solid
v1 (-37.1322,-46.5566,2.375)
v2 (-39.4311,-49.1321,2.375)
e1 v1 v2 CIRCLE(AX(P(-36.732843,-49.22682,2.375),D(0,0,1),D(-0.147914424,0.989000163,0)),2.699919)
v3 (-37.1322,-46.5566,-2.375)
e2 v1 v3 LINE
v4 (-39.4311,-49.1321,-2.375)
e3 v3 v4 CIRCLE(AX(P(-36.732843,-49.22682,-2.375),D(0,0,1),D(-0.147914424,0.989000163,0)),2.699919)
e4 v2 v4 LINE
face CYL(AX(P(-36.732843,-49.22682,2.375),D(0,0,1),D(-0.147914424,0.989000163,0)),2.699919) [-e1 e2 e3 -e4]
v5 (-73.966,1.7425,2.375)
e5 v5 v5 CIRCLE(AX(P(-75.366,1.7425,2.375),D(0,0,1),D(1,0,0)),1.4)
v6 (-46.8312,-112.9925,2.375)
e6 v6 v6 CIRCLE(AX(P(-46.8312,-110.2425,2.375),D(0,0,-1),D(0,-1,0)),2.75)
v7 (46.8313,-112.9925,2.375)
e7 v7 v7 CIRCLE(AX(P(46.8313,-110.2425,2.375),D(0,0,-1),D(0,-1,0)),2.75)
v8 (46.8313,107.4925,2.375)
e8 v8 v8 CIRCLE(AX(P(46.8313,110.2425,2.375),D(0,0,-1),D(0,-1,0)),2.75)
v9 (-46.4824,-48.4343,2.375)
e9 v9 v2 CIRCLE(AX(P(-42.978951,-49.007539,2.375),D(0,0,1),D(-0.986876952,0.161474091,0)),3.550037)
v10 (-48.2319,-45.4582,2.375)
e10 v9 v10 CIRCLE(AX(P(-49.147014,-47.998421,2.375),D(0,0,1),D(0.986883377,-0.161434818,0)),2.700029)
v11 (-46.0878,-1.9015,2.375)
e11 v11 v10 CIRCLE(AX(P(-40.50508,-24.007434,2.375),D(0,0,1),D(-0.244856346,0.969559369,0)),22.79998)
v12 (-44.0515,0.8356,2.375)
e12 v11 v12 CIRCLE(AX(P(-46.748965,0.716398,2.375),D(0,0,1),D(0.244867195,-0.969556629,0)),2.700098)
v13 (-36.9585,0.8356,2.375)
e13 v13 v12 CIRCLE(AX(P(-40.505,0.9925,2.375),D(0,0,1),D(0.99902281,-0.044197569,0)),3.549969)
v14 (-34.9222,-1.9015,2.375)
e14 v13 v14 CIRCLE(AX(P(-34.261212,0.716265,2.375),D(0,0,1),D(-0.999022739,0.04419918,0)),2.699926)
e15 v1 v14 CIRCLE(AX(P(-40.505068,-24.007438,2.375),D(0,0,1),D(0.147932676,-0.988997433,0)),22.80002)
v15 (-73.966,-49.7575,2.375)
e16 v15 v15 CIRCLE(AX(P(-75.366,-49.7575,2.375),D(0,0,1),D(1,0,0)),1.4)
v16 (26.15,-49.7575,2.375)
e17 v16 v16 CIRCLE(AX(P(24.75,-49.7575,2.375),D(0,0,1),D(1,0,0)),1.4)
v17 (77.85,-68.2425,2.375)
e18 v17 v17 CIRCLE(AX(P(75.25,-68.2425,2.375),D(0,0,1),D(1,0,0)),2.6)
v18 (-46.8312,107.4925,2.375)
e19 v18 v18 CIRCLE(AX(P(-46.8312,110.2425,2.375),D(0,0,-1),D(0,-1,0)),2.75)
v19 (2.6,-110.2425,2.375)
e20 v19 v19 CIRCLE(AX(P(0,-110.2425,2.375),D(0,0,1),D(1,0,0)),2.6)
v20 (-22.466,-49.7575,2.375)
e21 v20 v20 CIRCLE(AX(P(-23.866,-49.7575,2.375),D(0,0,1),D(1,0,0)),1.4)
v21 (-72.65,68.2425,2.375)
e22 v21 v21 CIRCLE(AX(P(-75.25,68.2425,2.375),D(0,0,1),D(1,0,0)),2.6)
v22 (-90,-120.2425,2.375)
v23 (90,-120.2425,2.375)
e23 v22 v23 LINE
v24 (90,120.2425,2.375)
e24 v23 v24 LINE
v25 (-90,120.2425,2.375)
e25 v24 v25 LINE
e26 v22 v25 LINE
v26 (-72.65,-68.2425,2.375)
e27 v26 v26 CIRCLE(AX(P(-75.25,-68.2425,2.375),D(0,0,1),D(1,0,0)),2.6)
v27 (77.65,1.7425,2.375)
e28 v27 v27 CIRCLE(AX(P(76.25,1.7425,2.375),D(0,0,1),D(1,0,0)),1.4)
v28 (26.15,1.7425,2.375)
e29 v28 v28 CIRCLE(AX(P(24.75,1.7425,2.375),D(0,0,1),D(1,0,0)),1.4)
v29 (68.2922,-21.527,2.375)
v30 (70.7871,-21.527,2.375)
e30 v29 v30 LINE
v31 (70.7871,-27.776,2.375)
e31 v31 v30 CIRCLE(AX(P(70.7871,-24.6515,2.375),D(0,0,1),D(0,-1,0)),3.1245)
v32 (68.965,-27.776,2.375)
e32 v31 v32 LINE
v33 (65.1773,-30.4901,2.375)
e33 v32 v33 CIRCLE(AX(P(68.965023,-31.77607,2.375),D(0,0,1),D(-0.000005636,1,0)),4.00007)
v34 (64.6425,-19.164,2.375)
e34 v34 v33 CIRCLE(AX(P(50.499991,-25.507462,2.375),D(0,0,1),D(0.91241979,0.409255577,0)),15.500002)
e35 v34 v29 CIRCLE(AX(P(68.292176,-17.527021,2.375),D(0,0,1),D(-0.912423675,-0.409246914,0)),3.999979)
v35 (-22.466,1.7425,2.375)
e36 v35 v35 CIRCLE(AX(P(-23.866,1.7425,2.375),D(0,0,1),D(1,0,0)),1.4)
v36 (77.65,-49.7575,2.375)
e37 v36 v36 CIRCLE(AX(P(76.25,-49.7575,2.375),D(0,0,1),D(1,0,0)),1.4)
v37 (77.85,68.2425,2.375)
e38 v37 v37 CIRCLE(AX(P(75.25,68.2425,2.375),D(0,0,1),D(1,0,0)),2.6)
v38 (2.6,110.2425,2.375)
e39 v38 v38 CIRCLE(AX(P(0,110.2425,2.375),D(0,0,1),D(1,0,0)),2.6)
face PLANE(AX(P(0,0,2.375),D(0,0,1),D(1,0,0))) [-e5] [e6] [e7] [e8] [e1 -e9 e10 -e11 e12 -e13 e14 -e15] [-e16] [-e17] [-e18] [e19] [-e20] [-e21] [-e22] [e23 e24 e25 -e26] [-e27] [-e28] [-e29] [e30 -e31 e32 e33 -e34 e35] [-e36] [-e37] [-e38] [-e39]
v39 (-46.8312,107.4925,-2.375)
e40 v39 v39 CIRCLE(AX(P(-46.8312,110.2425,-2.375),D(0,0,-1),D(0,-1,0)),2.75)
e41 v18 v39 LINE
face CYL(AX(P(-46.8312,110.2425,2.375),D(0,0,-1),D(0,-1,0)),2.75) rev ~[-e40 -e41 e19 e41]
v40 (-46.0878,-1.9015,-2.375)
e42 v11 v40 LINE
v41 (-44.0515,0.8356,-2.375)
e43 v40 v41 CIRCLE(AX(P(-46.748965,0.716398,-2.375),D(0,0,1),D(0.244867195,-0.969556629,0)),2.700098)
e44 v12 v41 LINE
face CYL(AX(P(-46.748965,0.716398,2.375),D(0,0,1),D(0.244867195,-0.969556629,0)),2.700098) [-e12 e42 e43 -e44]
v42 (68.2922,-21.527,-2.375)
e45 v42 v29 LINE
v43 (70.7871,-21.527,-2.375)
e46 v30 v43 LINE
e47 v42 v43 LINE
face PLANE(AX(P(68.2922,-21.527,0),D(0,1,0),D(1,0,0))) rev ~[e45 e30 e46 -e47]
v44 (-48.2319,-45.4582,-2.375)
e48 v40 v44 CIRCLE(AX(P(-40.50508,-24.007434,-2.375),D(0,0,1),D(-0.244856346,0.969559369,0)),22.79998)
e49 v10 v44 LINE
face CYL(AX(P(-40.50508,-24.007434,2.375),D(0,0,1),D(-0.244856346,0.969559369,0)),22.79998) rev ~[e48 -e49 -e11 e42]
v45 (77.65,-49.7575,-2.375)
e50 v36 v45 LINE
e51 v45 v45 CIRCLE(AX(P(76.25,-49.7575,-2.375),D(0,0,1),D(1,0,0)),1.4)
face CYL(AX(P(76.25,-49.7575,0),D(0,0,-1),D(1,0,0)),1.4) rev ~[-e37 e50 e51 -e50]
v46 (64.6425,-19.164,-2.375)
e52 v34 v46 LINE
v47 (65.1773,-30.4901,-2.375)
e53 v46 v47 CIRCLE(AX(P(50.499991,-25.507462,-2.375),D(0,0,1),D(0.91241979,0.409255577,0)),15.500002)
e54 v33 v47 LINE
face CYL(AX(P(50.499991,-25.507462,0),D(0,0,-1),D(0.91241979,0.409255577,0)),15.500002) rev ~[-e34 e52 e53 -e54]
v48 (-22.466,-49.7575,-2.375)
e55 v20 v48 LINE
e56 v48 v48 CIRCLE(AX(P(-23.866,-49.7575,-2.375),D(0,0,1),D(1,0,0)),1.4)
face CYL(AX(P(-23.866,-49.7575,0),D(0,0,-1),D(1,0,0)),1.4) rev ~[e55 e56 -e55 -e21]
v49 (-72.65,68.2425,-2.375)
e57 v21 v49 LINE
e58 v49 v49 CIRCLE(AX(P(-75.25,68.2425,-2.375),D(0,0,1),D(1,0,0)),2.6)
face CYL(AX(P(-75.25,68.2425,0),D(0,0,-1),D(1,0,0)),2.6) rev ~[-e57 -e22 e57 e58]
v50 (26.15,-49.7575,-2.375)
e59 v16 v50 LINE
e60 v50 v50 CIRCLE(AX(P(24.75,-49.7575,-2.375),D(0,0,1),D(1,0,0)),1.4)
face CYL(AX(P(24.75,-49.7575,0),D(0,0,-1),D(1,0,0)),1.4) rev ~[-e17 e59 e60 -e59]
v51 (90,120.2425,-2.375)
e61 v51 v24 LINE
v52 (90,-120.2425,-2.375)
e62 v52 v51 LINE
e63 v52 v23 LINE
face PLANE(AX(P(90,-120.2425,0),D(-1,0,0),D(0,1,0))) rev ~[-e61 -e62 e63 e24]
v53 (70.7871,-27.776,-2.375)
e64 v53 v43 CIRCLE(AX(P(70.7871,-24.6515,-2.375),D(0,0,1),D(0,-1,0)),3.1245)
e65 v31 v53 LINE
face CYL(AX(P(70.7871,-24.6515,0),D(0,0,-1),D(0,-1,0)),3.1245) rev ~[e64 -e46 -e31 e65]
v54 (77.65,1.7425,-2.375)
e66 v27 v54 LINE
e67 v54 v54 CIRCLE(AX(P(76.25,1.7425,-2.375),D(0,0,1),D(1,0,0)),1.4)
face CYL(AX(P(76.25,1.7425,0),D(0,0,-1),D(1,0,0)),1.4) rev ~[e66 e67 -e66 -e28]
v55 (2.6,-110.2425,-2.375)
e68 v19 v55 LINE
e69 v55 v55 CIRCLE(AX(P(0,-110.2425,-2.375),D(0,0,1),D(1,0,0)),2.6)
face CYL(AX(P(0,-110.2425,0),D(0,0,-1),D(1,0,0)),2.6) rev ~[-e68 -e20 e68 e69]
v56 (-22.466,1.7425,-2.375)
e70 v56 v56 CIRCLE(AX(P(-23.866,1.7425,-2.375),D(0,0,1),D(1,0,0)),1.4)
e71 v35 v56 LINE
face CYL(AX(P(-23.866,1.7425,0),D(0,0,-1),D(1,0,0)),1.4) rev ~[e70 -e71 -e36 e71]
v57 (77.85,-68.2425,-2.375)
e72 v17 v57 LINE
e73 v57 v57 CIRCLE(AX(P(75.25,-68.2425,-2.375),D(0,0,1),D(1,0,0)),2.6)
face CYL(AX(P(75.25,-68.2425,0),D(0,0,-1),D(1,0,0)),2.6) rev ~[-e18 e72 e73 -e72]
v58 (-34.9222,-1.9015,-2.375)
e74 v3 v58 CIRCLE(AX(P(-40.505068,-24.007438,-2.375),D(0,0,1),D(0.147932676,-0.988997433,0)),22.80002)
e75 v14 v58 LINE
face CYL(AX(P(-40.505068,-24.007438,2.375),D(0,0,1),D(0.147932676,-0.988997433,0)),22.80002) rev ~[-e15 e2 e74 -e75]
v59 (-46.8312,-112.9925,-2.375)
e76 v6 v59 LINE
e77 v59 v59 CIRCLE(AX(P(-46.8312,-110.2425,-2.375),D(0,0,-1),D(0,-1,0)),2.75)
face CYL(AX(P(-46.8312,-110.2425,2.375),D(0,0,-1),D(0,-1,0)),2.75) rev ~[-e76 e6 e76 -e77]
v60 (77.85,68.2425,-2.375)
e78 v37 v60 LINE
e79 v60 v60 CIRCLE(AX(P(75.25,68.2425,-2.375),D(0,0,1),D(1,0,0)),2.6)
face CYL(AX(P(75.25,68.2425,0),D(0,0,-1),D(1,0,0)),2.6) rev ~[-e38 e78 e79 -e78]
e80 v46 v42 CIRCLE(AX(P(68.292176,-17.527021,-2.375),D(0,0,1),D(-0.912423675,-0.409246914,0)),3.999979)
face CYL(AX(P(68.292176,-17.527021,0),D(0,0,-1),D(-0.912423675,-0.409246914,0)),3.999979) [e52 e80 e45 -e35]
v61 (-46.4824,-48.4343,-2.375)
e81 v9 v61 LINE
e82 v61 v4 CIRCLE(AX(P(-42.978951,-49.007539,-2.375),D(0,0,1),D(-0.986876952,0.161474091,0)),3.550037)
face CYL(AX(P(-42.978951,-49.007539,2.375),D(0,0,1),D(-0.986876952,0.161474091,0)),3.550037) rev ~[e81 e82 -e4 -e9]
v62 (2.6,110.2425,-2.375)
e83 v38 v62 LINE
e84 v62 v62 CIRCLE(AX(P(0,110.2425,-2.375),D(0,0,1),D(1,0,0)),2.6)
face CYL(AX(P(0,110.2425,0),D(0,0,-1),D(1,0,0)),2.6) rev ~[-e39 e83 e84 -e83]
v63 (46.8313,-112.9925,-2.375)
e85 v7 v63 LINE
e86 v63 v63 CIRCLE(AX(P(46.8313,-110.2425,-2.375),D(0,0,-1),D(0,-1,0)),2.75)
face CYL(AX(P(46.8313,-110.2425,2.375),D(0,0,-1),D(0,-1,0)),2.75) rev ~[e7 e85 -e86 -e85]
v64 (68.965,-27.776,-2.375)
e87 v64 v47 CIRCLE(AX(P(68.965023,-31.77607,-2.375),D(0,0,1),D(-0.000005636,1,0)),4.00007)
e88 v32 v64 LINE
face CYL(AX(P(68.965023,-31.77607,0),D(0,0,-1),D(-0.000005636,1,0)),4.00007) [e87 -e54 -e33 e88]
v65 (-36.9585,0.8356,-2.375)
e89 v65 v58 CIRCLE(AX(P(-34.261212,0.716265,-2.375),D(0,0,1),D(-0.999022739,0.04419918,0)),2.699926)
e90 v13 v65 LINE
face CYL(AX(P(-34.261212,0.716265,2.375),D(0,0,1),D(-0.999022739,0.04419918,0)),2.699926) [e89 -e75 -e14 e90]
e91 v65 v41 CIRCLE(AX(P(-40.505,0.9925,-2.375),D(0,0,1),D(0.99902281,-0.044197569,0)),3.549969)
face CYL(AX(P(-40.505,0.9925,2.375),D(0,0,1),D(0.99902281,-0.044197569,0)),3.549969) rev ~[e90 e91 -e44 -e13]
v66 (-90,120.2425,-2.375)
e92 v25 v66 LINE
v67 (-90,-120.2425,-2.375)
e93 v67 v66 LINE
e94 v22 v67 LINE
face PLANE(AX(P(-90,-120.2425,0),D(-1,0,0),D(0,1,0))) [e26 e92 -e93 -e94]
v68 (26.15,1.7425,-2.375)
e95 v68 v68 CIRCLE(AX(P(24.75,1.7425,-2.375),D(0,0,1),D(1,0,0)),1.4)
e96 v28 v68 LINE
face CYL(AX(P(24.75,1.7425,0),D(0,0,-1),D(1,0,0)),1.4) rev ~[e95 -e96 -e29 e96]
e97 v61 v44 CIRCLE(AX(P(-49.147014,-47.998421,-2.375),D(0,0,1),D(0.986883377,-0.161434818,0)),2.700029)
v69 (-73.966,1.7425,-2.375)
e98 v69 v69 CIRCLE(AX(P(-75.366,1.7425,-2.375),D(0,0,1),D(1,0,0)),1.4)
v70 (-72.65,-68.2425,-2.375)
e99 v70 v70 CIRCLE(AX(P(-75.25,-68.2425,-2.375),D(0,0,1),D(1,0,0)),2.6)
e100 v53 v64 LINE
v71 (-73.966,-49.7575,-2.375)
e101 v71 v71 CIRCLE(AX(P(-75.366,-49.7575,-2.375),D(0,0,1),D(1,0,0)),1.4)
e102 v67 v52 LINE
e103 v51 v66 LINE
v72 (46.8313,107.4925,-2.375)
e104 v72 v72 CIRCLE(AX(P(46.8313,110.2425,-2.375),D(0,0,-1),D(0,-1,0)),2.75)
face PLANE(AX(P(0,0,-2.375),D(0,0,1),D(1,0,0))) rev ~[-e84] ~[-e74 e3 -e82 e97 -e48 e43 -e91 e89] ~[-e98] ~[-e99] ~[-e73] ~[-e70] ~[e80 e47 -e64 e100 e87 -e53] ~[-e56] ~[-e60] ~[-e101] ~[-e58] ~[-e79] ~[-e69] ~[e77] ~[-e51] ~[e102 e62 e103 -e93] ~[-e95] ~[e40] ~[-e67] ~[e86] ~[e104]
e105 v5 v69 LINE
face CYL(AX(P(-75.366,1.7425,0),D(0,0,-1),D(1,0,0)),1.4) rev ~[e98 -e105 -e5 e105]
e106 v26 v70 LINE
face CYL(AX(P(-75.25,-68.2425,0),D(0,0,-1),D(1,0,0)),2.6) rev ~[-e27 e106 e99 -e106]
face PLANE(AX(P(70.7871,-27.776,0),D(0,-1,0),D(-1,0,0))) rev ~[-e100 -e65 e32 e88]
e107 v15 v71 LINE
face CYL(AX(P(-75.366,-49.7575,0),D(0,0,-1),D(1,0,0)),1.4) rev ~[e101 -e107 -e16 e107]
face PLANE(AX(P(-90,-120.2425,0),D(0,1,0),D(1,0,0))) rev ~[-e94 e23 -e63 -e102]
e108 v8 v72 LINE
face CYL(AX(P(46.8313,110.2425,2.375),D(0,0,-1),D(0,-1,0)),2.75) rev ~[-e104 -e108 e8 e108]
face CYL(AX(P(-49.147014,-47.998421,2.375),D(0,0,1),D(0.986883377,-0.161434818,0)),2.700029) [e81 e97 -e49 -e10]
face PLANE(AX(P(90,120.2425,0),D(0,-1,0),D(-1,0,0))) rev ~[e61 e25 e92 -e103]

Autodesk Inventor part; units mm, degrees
ref_plane "YZ Plane" through (0, 0, 0) normal (1, 0, 0) x (0, 1, 0)
ref_plane "XZ Plane" through (0, 0, 0) normal (0, 1, 0) x (-1, 0, 0)
ref_plane "XY Plane" through (0, 0, 0) normal (0, 0, 1) x (1, 0, 0)
sketch "Face" plane through (0, 0, 0) normal (0, 0, 1) x (1, 0, 0)
  circle A0 centre (165.25, 188.4851) radius 2.6
  line L0 (158.2922, 98.7156) -> (160.7871, 98.7156)
  line L1 (160.7871, 92.4666) -> (158.965, 92.4666)
  arc A1 (158.965, 92.4666) -> (155.1773, 89.7524) centre (158.965, 88.4666) ccw
  circle A2 centre (114.75, 121.9851) radius 1.4
  arc A3 (154.6425, 101.0786) -> (155.1773, 89.7524) centre (140.5, 94.7351) ccw
  circle A4 centre (166.25, 70.4851) radius 1.4
  circle A5 centre (66.134, 121.9851) radius 1.4
  circle A6 centre (49.495, 121.2351) radius 2
  line L2 (180, 0) -> (180, 240.4851)
  line L3 (0, 0) -> (0, 240.4851)
  circle A7 centre (49.495, 96.2351) radius 16
  circle A8 centre (66.134, 70.4851) radius 1.4
  circle A9 centre (47.0211, 71.2351) radius 2
  line L4 (0, 0) -> (180, 0)
  circle A10 centre (90, 10) radius 2.6
  circle A11 centre (14.634, 121.9851) radius 1.4
  arc A12 (154.6425, 101.0786) -> (158.2922, 98.7156) centre (158.2922, 102.7156) ccw
  circle A13 centre (14.75, 52) radius 2.6
  circle A14 centre (90, 230.4851) radius 2.6
  circle A15 centre (14.75, 188.4851) radius 2.6
  circle A16 centre (165.25, 52) radius 2.6
  line L5 (180, 240.4851) -> (0, 240.4851)
  circle A17 centre (166.25, 121.9851) radius 1.4
  circle A18 centre (14.634, 70.4851) radius 1.4
  arc A19 (160.7871, 92.4666) -> (160.7871, 98.7156) centre (160.7871, 95.5911) ccw
  circle A20 centre (114.75, 70.4851) radius 1.4
  point P0 (106.7876, 102.9578)
sketch "PEEP Cutout" plane through (0, 0, 0) normal (0, 0, 1) x (1, 0, 0)
  circle A0 centre (66.134, -170) radius 1.4
  circle A1 centre (66.134, -118.5) radius 1.4
  arc A2 (52.8678, -166.7992) -> (55.0778, -122.1441) centre (49.495, -144.25) ccw
  arc A3 (52.8678, -166.7992) -> (50.5689, -169.3746) centre (53.2672, -169.4694) ccw
  arc A4 (43.5176, -168.6769) -> (50.5689, -169.3746) centre (47.0211, -169.25) ccw
  arc A5 (43.5176, -168.6769) -> (41.7681, -165.7008) centre (40.8531, -168.241) ccw
  arc A6 (43.9122, -122.1441) -> (41.7681, -165.7008) centre (49.495, -144.25) ccw
  arc A7 (43.9122, -122.1441) -> (45.9485, -119.4069) centre (43.2511, -119.5262) ccw
  arc A8 (53.0415, -119.4069) -> (45.9485, -119.4069) centre (49.495, -119.25) ccw
  arc A9 (53.0415, -119.4069) -> (55.0778, -122.1441) centre (55.7389, -119.5262) ccw
  circle A10 centre (14.634, -170) radius 1.4
  circle A11 centre (14.634, -118.5) radius 1.4
  point P0 (46.7949, -144.2181)
sketch "Sketch1" plane through (0, 0, 0) normal (0, 0, 1) x (1, 0, 0)
  circle A0 centre (75.25, 68.2425) radius 2.6
  line L0 (68.2922, -21.527) -> (70.7871, -21.527)
  line L1 (70.7871, -27.776) -> (68.965, -27.776)
  arc A1 (68.965, -27.776) -> (65.1773, -30.4901) centre (68.965, -31.776) ccw
  circle A2 centre (24.75, 1.7425) radius 1.4
  arc A3 (64.6425, -19.164) -> (65.1773, -30.4901) centre (50.5, -25.5075) ccw
  circle A4 centre (76.25, -49.7575) radius 1.4
  circle A5 centre (-23.866, 1.7425) radius 1.4
  circle A6 centre (-40.505, 0.9925) radius 2
  line L2 (90, -120.2425) -> (90, 120.2425)
  line L3 (-90, -120.2425) -> (-90, 120.2425)
  circle A7 centre (-40.505, -24.0075) radius 16
  circle A8 centre (-23.866, -49.7575) radius 1.4
  circle A9 centre (-42.9789, -49.0075) radius 2
  line L4 (-90, -120.2425) -> (90, -120.2425)
  circle A10 centre (0, -110.2425) radius 2.6
  circle A11 centre (-75.366, 1.7425) radius 1.4
  arc A12 (64.6425, -19.164) -> (68.2922, -21.527) centre (68.2922, -17.527) ccw
  circle A13 centre (-75.25, -68.2425) radius 2.6
  circle A14 centre (0, 110.2425) radius 2.6
  circle A15 centre (-75.25, 68.2425) radius 2.6
  circle A16 centre (75.25, -68.2425) radius 2.6
  line L5 (90, 120.2425) -> (-90, 120.2425)
  circle A17 centre (76.25, 1.7425) radius 1.4
  circle A18 centre (-75.366, -49.7575) radius 1.4
  arc A19 (70.7871, -27.776) -> (70.7871, -21.527) centre (70.7871, -24.6515) ccw
  circle A20 centre (24.75, -49.7575) radius 1.4
  point P0 (0, 0)
  point P1 (90, 0)
  point P2 (0, -120.2425)
extrude "Extrusion1" add sketch "Sketch1" along normal mid plane 4.75
sketch "Sketch2" plane through (0, 0, 2.375) normal (0, 0, 1) x (1, 0, 0)
  circle A0 centre (0, 110.2425) radius 2.6 projected
  circle A1 centre (0, -110.2425) radius 2.6 projected
  point P0 (0, 0)
  point P1 (46.8313, 110.2425)
  point P2 (-46.8312, 110.2425)
  point P3 (-46.8312, -110.2425)
  point P4 (46.8313, 110.2425)
  point P5 (46.8313, -110.2425)
  dimension "d2" = 93.6625
  dimension "d3" = 46.8312
hole "Hole1" at (46.8313, 110.2425, 2.375) at (-46.8312, 110.2425, 2.375) at (-46.8312, -110.2425, 2.375) at (46.8313, -110.2425, 2.375) direction (0, 0, -1) diameter 5.5 end through all clearance for "Socket Head Cap Screw" size "M5" standard "Ansi Metric M Profile"
sketch "Sketch3" plane through (0, 0, 2.375) normal (0, 0, 1) x (1, 0, 0)
  circle A0 centre (-40.505, -24.0075) radius 16 projected
  circle A1 centre (-23.866, -49.7575) radius 1.4 projected
  circle A2 centre (-23.866, -49.7575) radius 1.4
  circle A3 centre (-23.866, 1.7425) radius 1.4
  arc A4 (-37.1322, -46.5566) -> (-34.9222, -1.9015) centre (-40.505, -24.0075) ccw
  arc A5 (-37.1322, -46.5566) -> (-39.4311, -49.1321) centre (-36.7328, -49.2269) ccw
  arc A6 (-46.4824, -48.4343) -> (-39.4311, -49.1321) centre (-42.9789, -49.0075) ccw
  arc A7 (-46.4824, -48.4343) -> (-48.2319, -45.4582) centre (-49.1469, -47.9984) ccw
  arc A8 (-46.0878, -1.9015) -> (-48.2319, -45.4582) centre (-40.505, -24.0075) ccw
  arc A9 (-46.0878, -1.9015) -> (-44.0515, 0.8356) centre (-46.7489, 0.7163) ccw
  arc A10 (-36.9585, 0.8356) -> (-44.0515, 0.8356) centre (-40.505, 0.9925) ccw
  arc A11 (-36.9585, 0.8356) -> (-34.9222, -1.9015) centre (-34.2611, 0.7163) ccw
  circle A12 centre (-75.366, -49.7575) radius 1.4
  circle A13 centre (-75.366, 1.7425) radius 1.4
  point P0 (0, 0)
extrude "Extrusion2" cut sketch "Sketch3" against normal through all contours A5 A6 A7 A8 A9 A10 A11 A4
equation "\"d3\" = 0.5 * d2"
properties part number "BREEZE-M10"
